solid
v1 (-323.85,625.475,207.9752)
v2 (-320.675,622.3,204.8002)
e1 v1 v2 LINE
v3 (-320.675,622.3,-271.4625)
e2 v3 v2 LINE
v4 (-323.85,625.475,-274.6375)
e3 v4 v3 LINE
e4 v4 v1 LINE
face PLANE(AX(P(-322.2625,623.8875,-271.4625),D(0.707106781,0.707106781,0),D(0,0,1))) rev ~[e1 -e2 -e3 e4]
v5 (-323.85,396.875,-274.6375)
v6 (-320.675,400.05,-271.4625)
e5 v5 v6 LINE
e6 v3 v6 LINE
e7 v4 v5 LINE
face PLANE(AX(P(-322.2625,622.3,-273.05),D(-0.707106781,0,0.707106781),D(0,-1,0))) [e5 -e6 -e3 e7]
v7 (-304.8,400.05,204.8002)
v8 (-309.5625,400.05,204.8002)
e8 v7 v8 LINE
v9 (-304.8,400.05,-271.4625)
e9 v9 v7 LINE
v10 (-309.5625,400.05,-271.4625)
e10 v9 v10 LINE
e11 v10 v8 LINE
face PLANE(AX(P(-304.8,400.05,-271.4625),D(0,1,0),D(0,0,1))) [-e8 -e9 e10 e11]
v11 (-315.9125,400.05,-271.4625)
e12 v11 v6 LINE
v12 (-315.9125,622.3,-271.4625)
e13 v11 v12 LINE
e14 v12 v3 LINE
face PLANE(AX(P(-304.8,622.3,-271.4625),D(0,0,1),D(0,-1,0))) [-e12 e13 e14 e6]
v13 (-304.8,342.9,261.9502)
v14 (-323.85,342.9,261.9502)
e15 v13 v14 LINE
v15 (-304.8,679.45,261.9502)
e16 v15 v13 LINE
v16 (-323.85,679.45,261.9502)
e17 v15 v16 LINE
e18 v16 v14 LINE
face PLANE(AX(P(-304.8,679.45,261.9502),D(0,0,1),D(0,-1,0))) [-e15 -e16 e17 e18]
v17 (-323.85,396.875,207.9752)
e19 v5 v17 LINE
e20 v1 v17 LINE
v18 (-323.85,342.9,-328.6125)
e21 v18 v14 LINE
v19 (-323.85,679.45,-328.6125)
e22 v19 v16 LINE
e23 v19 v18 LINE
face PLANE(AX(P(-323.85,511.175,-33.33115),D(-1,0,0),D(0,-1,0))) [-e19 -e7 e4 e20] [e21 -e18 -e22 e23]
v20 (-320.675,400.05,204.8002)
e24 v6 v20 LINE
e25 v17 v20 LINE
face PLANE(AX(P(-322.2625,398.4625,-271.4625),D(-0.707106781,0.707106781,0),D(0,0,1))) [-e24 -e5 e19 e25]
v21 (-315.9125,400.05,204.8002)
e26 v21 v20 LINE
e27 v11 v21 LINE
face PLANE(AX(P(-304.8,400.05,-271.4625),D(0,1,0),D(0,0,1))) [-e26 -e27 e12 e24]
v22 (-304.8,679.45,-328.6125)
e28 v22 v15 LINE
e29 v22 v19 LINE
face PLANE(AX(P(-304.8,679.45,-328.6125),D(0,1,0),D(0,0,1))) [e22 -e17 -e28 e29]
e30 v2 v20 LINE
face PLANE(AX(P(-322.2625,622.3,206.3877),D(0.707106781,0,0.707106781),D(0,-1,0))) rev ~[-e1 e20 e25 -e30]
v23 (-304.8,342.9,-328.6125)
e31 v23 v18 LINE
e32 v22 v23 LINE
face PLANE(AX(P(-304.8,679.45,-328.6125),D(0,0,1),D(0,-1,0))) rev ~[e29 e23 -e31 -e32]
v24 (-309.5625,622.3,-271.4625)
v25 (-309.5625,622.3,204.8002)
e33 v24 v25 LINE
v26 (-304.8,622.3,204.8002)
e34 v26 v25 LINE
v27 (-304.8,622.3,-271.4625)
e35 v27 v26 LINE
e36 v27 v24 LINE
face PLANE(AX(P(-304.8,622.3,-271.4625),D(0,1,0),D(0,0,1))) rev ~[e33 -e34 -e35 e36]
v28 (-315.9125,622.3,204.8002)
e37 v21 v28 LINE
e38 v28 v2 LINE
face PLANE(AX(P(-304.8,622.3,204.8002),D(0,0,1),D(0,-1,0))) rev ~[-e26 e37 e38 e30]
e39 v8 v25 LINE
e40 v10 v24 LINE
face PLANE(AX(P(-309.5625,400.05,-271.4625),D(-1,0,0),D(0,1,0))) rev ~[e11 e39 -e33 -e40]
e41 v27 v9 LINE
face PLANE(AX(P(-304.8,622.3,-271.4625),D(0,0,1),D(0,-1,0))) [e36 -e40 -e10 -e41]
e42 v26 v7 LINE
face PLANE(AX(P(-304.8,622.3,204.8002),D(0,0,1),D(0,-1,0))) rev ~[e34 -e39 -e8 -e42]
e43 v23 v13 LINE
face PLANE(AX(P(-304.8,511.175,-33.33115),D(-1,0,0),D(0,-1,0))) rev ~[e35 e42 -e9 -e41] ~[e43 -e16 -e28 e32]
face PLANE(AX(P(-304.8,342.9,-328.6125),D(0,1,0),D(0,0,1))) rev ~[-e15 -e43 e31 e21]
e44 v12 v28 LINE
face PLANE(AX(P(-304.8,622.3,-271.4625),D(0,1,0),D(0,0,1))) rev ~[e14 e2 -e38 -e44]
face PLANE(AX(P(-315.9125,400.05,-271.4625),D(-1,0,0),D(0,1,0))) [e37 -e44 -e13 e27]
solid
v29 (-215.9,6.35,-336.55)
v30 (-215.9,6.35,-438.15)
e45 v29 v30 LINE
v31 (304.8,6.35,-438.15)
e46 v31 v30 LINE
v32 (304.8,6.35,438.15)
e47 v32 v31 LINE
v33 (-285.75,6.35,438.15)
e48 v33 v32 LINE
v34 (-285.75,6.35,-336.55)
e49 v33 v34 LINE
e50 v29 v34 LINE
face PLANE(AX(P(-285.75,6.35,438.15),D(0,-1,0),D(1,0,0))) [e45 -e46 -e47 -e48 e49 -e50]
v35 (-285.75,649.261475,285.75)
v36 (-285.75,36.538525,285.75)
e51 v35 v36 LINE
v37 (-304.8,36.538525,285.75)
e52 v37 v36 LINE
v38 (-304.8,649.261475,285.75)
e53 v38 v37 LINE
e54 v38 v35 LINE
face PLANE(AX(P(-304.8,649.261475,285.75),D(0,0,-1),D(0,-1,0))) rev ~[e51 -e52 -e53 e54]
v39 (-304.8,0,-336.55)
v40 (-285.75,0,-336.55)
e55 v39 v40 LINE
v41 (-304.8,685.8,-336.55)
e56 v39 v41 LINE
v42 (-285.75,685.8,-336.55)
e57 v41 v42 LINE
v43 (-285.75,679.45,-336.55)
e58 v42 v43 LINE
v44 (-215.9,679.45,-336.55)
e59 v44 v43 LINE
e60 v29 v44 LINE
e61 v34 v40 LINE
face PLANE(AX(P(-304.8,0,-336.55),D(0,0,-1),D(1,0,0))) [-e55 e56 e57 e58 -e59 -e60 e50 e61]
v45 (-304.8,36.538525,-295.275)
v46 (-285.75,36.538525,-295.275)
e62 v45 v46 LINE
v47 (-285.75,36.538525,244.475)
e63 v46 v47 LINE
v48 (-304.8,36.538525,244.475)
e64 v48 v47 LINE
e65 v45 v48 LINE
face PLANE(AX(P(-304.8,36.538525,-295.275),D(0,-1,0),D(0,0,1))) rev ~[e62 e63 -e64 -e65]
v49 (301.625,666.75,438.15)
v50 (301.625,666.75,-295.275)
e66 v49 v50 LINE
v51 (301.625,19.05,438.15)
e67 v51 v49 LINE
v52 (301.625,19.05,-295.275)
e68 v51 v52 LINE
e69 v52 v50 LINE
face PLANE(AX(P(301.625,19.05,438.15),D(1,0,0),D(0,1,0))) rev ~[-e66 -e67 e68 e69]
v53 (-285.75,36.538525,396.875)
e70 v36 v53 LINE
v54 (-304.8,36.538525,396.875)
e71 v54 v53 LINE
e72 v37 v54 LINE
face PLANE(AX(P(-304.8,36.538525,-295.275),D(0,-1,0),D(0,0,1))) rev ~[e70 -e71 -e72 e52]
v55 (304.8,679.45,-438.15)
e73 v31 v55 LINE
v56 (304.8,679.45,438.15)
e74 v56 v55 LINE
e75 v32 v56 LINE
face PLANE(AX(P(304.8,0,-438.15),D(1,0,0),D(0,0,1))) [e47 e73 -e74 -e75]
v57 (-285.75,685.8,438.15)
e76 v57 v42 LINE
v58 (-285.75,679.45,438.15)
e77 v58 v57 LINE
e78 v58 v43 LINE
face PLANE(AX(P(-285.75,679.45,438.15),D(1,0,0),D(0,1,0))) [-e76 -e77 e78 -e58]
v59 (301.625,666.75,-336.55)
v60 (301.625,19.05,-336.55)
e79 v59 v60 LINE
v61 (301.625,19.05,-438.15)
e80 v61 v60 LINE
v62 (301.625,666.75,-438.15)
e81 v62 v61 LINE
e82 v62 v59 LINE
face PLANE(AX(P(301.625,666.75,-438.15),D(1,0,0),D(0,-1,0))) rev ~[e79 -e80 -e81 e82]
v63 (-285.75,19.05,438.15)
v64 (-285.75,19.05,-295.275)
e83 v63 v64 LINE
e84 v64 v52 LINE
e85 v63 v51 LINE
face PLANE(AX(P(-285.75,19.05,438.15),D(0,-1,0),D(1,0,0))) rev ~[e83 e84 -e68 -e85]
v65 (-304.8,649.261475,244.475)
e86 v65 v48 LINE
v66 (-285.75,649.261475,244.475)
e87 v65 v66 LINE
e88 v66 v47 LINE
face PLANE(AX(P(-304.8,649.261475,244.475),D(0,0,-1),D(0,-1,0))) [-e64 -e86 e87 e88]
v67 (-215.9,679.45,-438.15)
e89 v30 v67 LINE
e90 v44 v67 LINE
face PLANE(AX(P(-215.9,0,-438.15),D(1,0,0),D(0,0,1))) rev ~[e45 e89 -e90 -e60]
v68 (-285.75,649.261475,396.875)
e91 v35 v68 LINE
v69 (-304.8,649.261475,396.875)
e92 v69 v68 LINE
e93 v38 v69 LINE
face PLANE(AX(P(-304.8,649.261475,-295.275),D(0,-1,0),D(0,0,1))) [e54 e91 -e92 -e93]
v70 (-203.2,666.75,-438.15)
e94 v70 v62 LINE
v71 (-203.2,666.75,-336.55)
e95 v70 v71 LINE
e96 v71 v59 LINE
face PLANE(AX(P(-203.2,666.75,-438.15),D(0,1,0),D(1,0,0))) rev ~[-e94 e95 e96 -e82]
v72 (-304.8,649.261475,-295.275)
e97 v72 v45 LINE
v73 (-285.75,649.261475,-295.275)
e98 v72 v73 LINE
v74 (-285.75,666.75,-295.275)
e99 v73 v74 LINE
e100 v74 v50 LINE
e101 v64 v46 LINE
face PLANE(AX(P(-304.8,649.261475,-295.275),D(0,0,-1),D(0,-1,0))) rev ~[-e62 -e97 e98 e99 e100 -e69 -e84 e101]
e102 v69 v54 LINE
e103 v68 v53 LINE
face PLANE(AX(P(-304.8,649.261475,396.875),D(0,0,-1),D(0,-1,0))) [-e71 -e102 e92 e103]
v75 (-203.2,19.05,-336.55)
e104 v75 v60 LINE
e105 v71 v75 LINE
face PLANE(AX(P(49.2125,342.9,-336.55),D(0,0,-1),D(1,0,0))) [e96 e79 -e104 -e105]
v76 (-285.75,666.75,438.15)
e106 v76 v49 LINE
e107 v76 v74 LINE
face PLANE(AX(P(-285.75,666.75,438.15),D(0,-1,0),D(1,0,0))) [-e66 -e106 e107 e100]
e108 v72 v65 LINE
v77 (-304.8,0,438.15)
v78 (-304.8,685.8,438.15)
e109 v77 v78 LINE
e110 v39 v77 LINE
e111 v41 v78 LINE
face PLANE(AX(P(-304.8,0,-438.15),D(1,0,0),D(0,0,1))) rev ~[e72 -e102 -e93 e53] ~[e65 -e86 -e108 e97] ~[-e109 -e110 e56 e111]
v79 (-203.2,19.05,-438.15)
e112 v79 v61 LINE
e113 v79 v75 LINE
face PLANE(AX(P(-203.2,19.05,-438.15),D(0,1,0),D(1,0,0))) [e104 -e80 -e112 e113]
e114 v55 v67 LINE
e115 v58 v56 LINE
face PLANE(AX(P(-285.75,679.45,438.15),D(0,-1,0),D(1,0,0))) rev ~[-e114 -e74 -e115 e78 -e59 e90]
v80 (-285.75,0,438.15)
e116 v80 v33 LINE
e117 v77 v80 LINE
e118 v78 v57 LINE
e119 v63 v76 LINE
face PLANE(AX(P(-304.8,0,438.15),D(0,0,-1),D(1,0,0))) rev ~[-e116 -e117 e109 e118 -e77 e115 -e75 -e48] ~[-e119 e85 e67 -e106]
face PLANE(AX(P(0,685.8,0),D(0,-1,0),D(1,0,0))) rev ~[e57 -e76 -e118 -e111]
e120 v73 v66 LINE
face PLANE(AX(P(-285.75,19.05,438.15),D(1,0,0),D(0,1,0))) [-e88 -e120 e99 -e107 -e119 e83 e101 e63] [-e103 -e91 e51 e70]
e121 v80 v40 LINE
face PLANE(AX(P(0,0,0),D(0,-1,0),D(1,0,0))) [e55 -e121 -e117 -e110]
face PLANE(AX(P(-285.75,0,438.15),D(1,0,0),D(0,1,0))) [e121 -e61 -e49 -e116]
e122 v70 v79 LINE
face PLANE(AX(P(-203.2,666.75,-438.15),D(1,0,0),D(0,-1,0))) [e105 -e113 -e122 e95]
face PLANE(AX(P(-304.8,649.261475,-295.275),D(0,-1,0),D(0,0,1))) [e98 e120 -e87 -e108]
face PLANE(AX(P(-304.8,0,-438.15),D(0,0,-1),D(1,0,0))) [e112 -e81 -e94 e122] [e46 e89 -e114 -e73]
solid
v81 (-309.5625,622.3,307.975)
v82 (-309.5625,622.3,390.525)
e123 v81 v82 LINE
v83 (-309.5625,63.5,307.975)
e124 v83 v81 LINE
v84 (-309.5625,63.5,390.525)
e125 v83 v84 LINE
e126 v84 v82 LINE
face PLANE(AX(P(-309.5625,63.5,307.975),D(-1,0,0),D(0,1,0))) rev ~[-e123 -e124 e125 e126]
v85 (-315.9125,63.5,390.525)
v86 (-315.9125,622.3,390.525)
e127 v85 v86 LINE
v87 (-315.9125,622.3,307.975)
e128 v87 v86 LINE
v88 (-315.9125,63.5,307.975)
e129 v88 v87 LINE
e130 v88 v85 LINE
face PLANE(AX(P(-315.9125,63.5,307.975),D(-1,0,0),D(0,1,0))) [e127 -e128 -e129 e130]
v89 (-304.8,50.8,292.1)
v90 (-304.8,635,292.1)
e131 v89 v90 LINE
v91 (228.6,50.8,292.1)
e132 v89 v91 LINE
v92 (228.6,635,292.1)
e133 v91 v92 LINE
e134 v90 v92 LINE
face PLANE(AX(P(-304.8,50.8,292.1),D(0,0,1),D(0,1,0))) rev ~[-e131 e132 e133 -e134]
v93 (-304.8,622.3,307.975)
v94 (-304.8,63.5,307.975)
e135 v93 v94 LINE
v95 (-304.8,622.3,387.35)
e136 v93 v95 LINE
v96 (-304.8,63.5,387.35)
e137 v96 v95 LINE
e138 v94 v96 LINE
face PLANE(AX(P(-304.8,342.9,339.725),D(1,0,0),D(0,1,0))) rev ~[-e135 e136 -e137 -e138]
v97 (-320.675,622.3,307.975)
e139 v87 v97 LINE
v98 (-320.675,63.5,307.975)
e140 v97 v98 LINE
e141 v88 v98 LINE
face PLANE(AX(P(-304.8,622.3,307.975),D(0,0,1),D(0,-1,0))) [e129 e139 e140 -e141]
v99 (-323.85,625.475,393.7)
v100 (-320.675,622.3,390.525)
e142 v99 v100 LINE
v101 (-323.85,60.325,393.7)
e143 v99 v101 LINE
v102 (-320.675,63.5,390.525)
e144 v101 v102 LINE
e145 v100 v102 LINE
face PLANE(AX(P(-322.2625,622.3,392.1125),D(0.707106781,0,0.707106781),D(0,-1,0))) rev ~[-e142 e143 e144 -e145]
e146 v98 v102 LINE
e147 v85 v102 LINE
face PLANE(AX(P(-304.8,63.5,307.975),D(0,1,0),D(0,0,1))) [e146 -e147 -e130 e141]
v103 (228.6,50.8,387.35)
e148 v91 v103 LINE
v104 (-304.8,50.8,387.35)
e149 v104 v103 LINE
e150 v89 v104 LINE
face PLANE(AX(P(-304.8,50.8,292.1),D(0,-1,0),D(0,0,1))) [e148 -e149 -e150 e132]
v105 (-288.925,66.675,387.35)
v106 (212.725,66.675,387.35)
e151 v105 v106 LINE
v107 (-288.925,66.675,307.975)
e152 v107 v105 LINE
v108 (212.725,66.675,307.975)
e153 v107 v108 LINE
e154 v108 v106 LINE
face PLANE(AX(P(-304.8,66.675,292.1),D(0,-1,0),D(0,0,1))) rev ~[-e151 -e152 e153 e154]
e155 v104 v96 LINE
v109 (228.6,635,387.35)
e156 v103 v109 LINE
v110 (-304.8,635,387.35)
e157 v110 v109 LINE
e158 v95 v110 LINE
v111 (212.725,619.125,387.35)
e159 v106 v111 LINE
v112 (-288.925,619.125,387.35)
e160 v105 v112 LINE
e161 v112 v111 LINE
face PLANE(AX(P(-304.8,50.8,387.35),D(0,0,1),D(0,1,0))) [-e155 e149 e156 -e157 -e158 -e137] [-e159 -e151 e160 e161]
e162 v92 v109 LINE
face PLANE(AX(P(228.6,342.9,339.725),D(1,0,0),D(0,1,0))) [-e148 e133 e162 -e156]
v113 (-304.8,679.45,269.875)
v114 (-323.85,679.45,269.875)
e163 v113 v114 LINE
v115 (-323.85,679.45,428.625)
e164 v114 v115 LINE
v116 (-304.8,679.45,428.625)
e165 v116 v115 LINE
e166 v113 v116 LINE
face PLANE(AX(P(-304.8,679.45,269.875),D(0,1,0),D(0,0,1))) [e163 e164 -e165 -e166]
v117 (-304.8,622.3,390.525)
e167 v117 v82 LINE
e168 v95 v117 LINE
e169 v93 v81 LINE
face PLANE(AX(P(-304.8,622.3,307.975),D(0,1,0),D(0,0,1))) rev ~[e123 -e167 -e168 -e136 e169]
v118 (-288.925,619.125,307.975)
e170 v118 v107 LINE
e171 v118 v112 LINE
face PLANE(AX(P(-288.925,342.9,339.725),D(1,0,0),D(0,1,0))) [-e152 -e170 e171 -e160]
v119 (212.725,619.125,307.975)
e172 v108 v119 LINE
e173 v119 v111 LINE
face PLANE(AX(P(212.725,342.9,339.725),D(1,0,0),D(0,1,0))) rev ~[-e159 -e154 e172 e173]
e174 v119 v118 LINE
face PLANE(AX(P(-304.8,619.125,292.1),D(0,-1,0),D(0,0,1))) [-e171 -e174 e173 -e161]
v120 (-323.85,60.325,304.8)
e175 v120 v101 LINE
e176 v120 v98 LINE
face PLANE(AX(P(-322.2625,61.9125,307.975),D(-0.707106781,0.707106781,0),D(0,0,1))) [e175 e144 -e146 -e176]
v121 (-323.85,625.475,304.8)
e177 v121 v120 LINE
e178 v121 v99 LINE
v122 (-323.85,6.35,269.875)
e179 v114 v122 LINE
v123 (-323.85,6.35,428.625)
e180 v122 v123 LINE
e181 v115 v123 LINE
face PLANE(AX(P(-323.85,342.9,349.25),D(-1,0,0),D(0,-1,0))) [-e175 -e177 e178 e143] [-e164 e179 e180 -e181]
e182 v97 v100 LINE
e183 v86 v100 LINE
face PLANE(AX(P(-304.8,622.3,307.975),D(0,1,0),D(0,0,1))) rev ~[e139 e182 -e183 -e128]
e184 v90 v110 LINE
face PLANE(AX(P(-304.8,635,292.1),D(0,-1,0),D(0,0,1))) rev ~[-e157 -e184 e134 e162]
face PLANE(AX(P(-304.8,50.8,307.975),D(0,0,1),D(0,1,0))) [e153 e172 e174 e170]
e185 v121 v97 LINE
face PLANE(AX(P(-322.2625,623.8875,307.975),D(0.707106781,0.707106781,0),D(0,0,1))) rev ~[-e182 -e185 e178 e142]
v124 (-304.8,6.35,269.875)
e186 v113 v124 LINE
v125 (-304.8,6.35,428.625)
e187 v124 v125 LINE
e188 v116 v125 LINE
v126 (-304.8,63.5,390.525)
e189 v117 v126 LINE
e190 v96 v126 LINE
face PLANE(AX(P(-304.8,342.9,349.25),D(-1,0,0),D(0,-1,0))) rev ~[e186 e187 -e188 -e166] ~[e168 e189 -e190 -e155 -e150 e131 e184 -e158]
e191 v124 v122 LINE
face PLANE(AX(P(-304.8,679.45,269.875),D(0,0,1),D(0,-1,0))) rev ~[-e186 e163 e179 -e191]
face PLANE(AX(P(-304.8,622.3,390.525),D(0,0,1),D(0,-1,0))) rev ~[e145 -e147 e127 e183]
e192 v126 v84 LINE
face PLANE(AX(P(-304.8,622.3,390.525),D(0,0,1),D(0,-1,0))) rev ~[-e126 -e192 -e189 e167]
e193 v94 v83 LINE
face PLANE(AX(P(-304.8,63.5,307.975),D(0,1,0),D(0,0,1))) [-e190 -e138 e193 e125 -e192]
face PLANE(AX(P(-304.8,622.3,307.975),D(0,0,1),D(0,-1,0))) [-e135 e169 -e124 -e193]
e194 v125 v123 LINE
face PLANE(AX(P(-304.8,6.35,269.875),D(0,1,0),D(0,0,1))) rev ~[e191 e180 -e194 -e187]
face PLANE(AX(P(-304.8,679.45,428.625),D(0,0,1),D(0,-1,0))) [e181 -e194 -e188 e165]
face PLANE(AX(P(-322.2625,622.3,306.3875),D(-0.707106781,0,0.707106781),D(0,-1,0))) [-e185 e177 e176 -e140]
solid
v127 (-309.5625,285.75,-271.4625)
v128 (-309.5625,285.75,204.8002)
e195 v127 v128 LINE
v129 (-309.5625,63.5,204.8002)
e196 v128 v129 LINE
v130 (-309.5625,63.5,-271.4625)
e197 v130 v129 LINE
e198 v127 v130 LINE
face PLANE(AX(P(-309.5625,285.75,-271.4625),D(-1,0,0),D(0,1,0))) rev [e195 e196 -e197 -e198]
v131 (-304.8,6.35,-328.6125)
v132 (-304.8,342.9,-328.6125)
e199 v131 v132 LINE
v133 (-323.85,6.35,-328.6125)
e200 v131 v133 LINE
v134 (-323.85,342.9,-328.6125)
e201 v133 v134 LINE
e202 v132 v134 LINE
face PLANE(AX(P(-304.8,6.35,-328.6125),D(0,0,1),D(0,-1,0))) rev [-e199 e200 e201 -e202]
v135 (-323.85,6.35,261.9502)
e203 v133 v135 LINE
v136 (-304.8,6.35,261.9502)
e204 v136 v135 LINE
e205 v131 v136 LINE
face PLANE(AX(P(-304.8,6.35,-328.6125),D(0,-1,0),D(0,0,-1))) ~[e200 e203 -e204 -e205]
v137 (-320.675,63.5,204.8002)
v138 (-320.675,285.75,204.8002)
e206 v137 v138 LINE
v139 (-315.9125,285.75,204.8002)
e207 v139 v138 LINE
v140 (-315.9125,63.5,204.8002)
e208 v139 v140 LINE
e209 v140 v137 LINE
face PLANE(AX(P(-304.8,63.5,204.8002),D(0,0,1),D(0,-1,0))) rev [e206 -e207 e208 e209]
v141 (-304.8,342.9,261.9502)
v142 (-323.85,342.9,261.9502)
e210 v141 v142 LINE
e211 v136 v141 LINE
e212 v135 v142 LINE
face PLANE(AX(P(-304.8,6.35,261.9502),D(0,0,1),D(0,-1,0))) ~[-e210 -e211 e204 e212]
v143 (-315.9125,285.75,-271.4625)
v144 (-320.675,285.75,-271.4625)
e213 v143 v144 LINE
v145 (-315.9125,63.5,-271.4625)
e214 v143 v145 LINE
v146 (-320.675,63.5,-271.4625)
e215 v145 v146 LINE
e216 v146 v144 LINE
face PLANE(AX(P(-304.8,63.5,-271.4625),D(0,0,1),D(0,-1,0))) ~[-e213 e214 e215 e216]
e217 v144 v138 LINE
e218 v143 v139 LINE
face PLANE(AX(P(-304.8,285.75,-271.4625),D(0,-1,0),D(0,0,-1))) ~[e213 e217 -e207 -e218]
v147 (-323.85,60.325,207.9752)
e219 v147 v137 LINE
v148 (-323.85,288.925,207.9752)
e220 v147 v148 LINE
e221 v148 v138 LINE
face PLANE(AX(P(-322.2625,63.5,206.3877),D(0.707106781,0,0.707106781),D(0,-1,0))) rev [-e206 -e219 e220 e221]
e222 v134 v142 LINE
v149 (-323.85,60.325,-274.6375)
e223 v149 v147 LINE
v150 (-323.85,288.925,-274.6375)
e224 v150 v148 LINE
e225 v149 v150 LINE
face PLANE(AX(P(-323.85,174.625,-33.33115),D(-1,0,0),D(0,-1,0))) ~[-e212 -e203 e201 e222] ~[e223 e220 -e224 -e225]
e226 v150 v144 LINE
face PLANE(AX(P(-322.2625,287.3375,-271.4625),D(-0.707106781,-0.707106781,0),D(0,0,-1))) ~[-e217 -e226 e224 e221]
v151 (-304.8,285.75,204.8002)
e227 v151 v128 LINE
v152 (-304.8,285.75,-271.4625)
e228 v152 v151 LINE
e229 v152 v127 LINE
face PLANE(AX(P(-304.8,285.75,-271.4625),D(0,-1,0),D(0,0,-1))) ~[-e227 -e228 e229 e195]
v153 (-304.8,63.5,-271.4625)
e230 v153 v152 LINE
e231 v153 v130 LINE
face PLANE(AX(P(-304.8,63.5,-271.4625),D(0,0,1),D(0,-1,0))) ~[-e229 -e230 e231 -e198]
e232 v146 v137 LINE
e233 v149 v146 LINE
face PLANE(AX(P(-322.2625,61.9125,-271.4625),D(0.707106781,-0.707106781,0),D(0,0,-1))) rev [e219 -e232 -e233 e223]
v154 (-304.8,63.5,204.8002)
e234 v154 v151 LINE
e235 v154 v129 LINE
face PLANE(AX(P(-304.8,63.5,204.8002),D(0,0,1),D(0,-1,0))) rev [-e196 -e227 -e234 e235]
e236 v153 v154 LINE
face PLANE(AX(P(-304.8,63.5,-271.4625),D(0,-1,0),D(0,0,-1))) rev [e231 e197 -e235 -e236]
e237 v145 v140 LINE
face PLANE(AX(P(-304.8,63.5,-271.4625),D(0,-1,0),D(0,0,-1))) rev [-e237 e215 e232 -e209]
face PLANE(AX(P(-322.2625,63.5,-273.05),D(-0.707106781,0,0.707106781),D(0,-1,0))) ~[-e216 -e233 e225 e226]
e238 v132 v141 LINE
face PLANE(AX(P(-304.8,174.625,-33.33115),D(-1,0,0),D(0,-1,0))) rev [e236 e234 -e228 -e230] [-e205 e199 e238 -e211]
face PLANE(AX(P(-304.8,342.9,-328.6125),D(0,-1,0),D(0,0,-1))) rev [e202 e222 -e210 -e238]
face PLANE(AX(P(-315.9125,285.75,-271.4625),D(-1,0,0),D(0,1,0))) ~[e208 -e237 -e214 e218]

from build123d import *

# Parameters (mm, degrees)
F0_W          = 609.6
F0_H          = 876.3
F1_DEPTH      = 685.8
F2_W          = 88.9
F2_H          = 101.6
F3_DEPTH      = 685.801
F4_W          = 612.7229508197
F4_H          = 692.15
F5_DEPTH      = 19.05
F6_W          = 590.55
F6_H          = 6.35
F7_DEPTH      = 876.301
F8_W          = 587.375
F8_H          = 647.7
F9_DEPTH      = 733.425
F10_W         = 612.7229508197
F10_H         = 41.275
F11_DEPTH     = 19.05
F12_W         = 336.55
F12_H         = 590.5627
F12_W_2       = 222.25
F12_H_2       = 476.2627
F13_DEPTH     = 19.05
F14_W         = 6.35
F14_H         = 222.25
F15_DEPTH     = 476.2627
F16_SIZE      = 3.175
F17_W         = 673.1
F17_H         = 158.75
F17_W_2       = 558.8
F17_H_2       = 82.55
F18_DEPTH     = 19.05
F19_W         = 6.35
F19_H         = 558.8
F20_DEPTH     = 82.55
F21_SIZE      = 3.175
F22_W         = 504.825
F22_H         = 647.7
F23_DEPTH     = 101.6
F24_W         = 584.2
F24_H         = 95.25
F25_DEPTH     = 533.4
F26_T         = 15.875
F26_T3_DEPTH  = 37.249261314
F26_T5_DEPTH  = 37.249261314
F26_T7_DEPTH  = 37.249261314
F26_T9_DEPTH  = 37.249261314
F26_T11_DEPTH = 36.5125
F26_T13_DEPTH = 590.55
F26_T15_DEPTH = 114.3
F26_T17_DEPTH = 127
F26_T19_DEPTH = 615.95
F26_T21_DEPTH = 111.125
F26_T23_DEPTH = 36.5125


# Not quite as in the source:
# - a shell that OpenCascade refuses in one call is made with other operations: the cavity is built on its own and cut out


with BuildPart() as f1:
    # F0 (on Front) → F1 (new body)
    with BuildSketch(Plane.XZ):
        Rectangle(F0_W, F0_H)
    extrude(amount=-F1_DEPTH)

    # F2 (on face) → F3 (cut, through all)
    with BuildSketch(Plane.XZ):
        with Locations((-260.35, -387.35)):
            Rectangle(F2_W, F2_H)
    extrude(amount=-F3_DEPTH, mode=Mode.SUBTRACT)

    # F4 (on face) → F5 (cut)
    with BuildSketch(Plane(origin=(-304.8, 0, 0), x_dir=(0, -1, 0), z_dir=(-1, 0, 0))):
        with Locations((-342.9, 50.8)):
            Rectangle(F4_W, F4_H)
    extrude(amount=-F5_DEPTH, mode=Mode.SUBTRACT)

    # F6 (on face) → F7 (cut, through all)
    with BuildSketch(Plane.XY.offset(438.15)):
        with Locations((9.525, 682.625)):
            Rectangle(F6_W, F6_H)
        with Locations((9.525, 3.175)):
            Rectangle(F6_W, F6_H)
    extrude(amount=-F7_DEPTH, mode=Mode.SUBTRACT)

    # F8 (on face) → F9 (cut, through all)
    with BuildSketch(Plane.XY.offset(438.15)):
        with Locations((7.9375, 342.9)):
            Rectangle(F8_W, F8_H)
    extrude(amount=-F9_DEPTH, mode=Mode.SUBTRACT)

    # F10 (on face) → F11 (join, through all)
    with BuildSketch(Plane(origin=(-304.8, 0, 0), x_dir=(0, -1, 0), z_dir=(-1, 0, 0))):
        with Locations((-342.9, 265.1125)):
            Rectangle(F10_W, F10_H)
    extrude(amount=-F11_DEPTH)

    # F22 (on face) → F23 (cut)
    with BuildSketch(Plane(origin=(0, 0, -438.15), x_dir=(1, 0, 0), z_dir=(0, 0, -1))):
        with Locations((49.2125, -342.9)):
            Rectangle(F22_W, F22_H)
    extrude(amount=-F23_DEPTH, mode=Mode.SUBTRACT)


with BuildPart() as f13:
    # F12 (on face) → F13 (new body)
    with BuildSketch(Plane(origin=(-304.8, 0, 0), x_dir=(0, -1, 0), z_dir=(-1, 0, 0))):
        with Locations((-511.175, -33.33115)):
            Rectangle(F12_W, F12_H)
        with Locations((-511.175, -33.33115)):
            Rectangle(F12_W_2, F12_H_2, mode=Mode.SUBTRACT)
    extrude(amount=F13_DEPTH)

    # F14 (on face) → F15 (join, through all)
    with BuildSketch(Plane.XY.offset(-271.4625)):
        with Locations((-312.7375, 511.175)):
            Rectangle(F14_W, F14_H)
    extrude(amount=F15_DEPTH)

    # F16
    f16_edges = [f13.edges().sort_by_distance(p)[0] for p in [
        (-323.85, 622.3, -33.33115),
        (-323.85, 511.175, -271.4625),
        (-323.85, 400.05, -33.33115),
        (-323.85, 511.175, 204.8002),
    ]]
    chamfer(f16_edges, length=F16_SIZE)


with BuildPart() as f18:
    # F17 (on face) → F18 (new body)
    with BuildSketch(Plane(origin=(-304.8, 0, 0), x_dir=(0, -1, 0), z_dir=(-1, 0, 0))):
        with Locations((-342.9, 349.25)):
            Rectangle(F17_W, F17_H)
        with Locations((-342.9, 349.25)):
            Rectangle(F17_W_2, F17_H_2, mode=Mode.SUBTRACT)
    extrude(amount=F18_DEPTH)

    # F19 (on face) → F20 (join, through all)
    with BuildSketch(Plane.XY.offset(307.975)):
        with Locations((-312.7375, 342.9)):
            Rectangle(F19_W, F19_H)
    extrude(amount=F20_DEPTH)

    # F21
    f21_edges = [f18.edges().sort_by_distance(p)[0] for p in [
        (-323.85, 342.9, 307.975),
        (-323.85, 622.3, 349.25),
        (-323.85, 342.9, 390.525),
        (-323.85, 63.5, 349.25),
    ]]
    chamfer(f21_edges, length=F21_SIZE)

    # F24 (on face) → F25 (join)
    with BuildSketch(Plane.YZ.offset(-304.8)):
        with Locations((342.9, 339.725)):
            Rectangle(F24_W, F24_H)
    extrude(amount=F25_DEPTH)

    # F26: shell of thickness 15.875, made by hand


with BuildPart() as f26_core1:
    # F26_t2: copy of F18
    add(f18.part)

    # the walls: a layer under each face that stays
    f26_faces = [f26_core1.faces().sort_by_distance(p)[0] for p in [
        (-323.85, 567.2666666667, 296.3333333333),
        (-322.2625, 342.9, 306.3875),
        (-322.2625, 61.9125, 349.25),
        (-322.2625, 623.8875, 349.25),
        (-322.2625, 342.9, 392.1125),
        (-314.325, 342.9, 428.625),
        (-314.325, 679.45, 349.25),
        (-314.325, 342.9, 269.875),
        (-314.325, 6.35, 349.25),
        (-318.29375, 342.9, 307.975),
        (-318.29375, 63.5, 349.25),
        (-318.29375, 622.3, 349.25),
        (-318.29375, 342.9, 390.525),
        (-304.8, 567.2666666667, 402.1666666667),
        (-315.9125, 342.9, 349.25),
        (-38.1, 635, 339.725),
        (-38.1, 342.9, 292.1),
        (-38.1, 50.8, 339.725),
        (-307.18125, 63.5, 349.25),
        (-307.18125, 342.9, 390.525),
        (-307.18125, 622.3, 349.25),
        (-304.8, 342.9, 347.6625),
        (228.6, 342.9, 339.725),
        (-307.18125, 342.9, 307.975),
        (-309.5625, 342.9, 349.25),
    ]]
    thicken(f26_faces, amount=-F26_T, mode=Mode.SUBTRACT)

    # F26_s4 → F26_t3 (cut)
    with BuildSketch(Plane(origin=(4.5928978099, 4.5928978099, 4.5928978099), x_dir=(-0.7071067812, 0.7071067812, 0), z_dir=(0.5773502692, 0.5773502692, 0.5773502692))):
        Polygon((271.8908726623, 356.5892701441), (263.7152476623, 342.7036353262), (255.7777476623, 347.2863530879), (255.7777476623, 356.4517886113), align=None)
    extrude(amount=F26_T3_DEPTH, mode=Mode.SUBTRACT)

    # F26_s6 → F26_t5 (cut)
    with BuildSketch(Plane(origin=(-224.0071021901, 224.00710219, -224.0071021901), x_dir=(0.7071067812, 0.7071067812, 0), z_dir=(0.5773502692, -0.5773502692, 0.5773502692))):
        Polygon((213.0429578754, 636.5659477442), (221.2185828754, 622.6803129263), (229.1560828754, 627.263030688), (229.1560828754, 636.4284662114), align=None)
    extrude(amount=F26_T5_DEPTH, mode=Mode.SUBTRACT)

    # F26_s8 → F26_t7 (cut)
    with BuildSketch(Plane(origin=(-228.2404355234, -228.2404355234, 228.2404355234), x_dir=(-0.7071067812, 0.7071067812, 0), z_dir=(0.5773502692, 0.5773502692, -0.5773502692))):
        Polygon((271.8908726623, 213.7335916339), (255.7777476623, 213.8710731668), (255.7777476623, 223.0365086901), (263.7152476623, 227.6192264518), align=None)
    extrude(amount=F26_T7_DEPTH, mode=Mode.SUBTRACT)

    # F26_s10 → F26_t9 (cut)
    with BuildSketch(Plane(origin=(-456.8404355234, 456.8404355234, 456.8404355234), x_dir=(0.7071067812, 0.7071067812, 0), z_dir=(0.5773502692, -0.5773502692, -0.5773502692))):
        Polygon((213.0429578754, -66.2430859662), (229.1560828754, -66.1056044334), (229.1560828754, -56.94016891), (221.2185828754, -52.3574511483), align=None)
    extrude(amount=F26_T9_DEPTH, mode=Mode.SUBTRACT)

    # F26_s12 → F26_t11 (cut)
    with BuildSketch(Plane.YZ.offset(-336.55)):
        Polygon((622.14125, 308.13375), (622.3, 292.1), (638.175, 292.1), (638.175, 307.975), align=None)
        Polygon((63.65875, 308.13375), (63.5, 292.1), (47.625, 292.1), (47.625, 307.975), align=None)
        Polygon((63.65875, 390.36625), (47.625, 390.525), (47.625, 406.4), (63.5, 406.4), align=None)
        Polygon((622.14125, 390.36625), (638.175, 390.525), (638.175, 406.4), (622.3, 406.4), align=None)
    extrude(amount=F26_T11_DEPTH, mode=Mode.SUBTRACT)

    # F26_s14 → F26_t13 (cut)
    with BuildSketch(Plane.XZ.offset(-638.175)):
        Polygon((-316.07125, 308.13375), (-315.9125, 292.1), (-300.0375, 292.1), (-300.0375, 307.975), align=None)
        Polygon((-316.07125, 390.36625), (-315.9125, 406.4), (-300.0375, 406.4), (-300.0375, 390.525), align=None)
        Polygon((-309.40375, 390.36625), (-309.5625, 406.4), (-325.4375, 406.4), (-325.4375, 390.525), align=None)
        Polygon((-304.95875, 308.13375), (-288.925, 307.975), (-288.925, 292.1), (-304.8, 292.1), align=None)
        Polygon((-309.40375, 308.13375), (-309.5625, 292.1), (-325.4375, 292.1), (-325.4375, 307.975), align=None)
    extrude(amount=F26_T13_DEPTH, mode=Mode.SUBTRACT)

    # F26_s16 → F26_t15 (cut)
    with BuildSketch(Plane.XY.offset(292.1)):
        Polygon((-316.07125, 63.65875), (-315.9125, 47.625), (-300.0375, 47.625), (-300.0375, 63.5), align=None)
        Polygon((-316.07125, 622.14125), (-315.9125, 638.175), (-300.0375, 638.175), (-300.0375, 622.3), align=None)
        Polygon((-309.40375, 63.65875), (-309.5625, 47.625), (-325.4375, 47.625), (-325.4375, 63.5), align=None)
        Polygon((-309.40375, 622.14125), (-309.5625, 638.175), (-325.4375, 638.175), (-325.4375, 622.3), align=None)
    extrude(amount=F26_T15_DEPTH, mode=Mode.SUBTRACT)

    # F26_s18 → F26_t17 (cut)
    with BuildSketch(Plane.XY.offset(276.225)):
        Polygon((-304.64125, 635.15875), (-320.675, 635), (-320.675, 619.125), (-304.8, 619.125), align=None)
        Polygon((-304.64125, 50.64125), (-320.675, 50.8), (-320.675, 66.675), (-304.8, 66.675), align=None)
    extrude(amount=F26_T17_DEPTH, mode=Mode.SUBTRACT)

    # F26_s20 → F26_t19 (cut)
    with BuildSketch(Plane.XZ.offset(-650.875)):
        Polygon((-304.64125, 291.94125), (-320.675, 292.1), (-320.675, 307.975), (-304.8, 307.975), align=None)
    extrude(amount=F26_T19_DEPTH, mode=Mode.SUBTRACT)

    # F26_s22 → F26_t21 (cut)
    with BuildSketch(Plane.XY.offset(292.1)):
        Polygon((-304.95875, 63.65875), (-304.8, 47.625), (-288.925, 47.625), (-288.925, 63.5), align=None)
        Polygon((-304.95875, 622.14125), (-304.8, 638.175), (-288.925, 638.175), (-288.925, 622.3), align=None)
    extrude(amount=F26_T21_DEPTH, mode=Mode.SUBTRACT)

    # F26_s24 → F26_t23 (cut)
    with BuildSketch(Plane.YZ.offset(-325.4375)):
        Polygon((63.65875, 308.13375), (47.625, 307.975), (47.625, 292.1), (63.5, 292.1), align=None)
        Polygon((63.65875, 390.36625), (47.625, 390.525), (47.625, 406.4), (63.5, 406.4), align=None)
        Polygon((622.14125, 390.36625), (622.3, 406.4), (638.175, 406.4), (638.175, 390.525), align=None)
        Polygon((622.14125, 308.13375), (638.175, 307.975), (638.175, 292.1), (622.3, 292.1), align=None)
    extrude(amount=F26_T23_DEPTH, mode=Mode.SUBTRACT)


with BuildPart() as f18_1:
    add(f18.part)

    # what is left inside the walls is the cavity
    f26_cavity = [f26_core1.part.solids().sort_by_distance(p)[0] for p in [
        (45.508333, 342.9, 308.13375),
    ]]
    add(f26_cavity, mode=Mode.SUBTRACT)


with BuildPart() as f27_1:
    # F27: instance of F13
    add(f13.part.mirror(Plane(origin=(-314.325, 342.9, -33.33115), x_dir=(1, 0, 0), z_dir=(0, -1, 0))))


solid = Compound([f1.part, f13.part, f18_1.part, f27_1.part])
